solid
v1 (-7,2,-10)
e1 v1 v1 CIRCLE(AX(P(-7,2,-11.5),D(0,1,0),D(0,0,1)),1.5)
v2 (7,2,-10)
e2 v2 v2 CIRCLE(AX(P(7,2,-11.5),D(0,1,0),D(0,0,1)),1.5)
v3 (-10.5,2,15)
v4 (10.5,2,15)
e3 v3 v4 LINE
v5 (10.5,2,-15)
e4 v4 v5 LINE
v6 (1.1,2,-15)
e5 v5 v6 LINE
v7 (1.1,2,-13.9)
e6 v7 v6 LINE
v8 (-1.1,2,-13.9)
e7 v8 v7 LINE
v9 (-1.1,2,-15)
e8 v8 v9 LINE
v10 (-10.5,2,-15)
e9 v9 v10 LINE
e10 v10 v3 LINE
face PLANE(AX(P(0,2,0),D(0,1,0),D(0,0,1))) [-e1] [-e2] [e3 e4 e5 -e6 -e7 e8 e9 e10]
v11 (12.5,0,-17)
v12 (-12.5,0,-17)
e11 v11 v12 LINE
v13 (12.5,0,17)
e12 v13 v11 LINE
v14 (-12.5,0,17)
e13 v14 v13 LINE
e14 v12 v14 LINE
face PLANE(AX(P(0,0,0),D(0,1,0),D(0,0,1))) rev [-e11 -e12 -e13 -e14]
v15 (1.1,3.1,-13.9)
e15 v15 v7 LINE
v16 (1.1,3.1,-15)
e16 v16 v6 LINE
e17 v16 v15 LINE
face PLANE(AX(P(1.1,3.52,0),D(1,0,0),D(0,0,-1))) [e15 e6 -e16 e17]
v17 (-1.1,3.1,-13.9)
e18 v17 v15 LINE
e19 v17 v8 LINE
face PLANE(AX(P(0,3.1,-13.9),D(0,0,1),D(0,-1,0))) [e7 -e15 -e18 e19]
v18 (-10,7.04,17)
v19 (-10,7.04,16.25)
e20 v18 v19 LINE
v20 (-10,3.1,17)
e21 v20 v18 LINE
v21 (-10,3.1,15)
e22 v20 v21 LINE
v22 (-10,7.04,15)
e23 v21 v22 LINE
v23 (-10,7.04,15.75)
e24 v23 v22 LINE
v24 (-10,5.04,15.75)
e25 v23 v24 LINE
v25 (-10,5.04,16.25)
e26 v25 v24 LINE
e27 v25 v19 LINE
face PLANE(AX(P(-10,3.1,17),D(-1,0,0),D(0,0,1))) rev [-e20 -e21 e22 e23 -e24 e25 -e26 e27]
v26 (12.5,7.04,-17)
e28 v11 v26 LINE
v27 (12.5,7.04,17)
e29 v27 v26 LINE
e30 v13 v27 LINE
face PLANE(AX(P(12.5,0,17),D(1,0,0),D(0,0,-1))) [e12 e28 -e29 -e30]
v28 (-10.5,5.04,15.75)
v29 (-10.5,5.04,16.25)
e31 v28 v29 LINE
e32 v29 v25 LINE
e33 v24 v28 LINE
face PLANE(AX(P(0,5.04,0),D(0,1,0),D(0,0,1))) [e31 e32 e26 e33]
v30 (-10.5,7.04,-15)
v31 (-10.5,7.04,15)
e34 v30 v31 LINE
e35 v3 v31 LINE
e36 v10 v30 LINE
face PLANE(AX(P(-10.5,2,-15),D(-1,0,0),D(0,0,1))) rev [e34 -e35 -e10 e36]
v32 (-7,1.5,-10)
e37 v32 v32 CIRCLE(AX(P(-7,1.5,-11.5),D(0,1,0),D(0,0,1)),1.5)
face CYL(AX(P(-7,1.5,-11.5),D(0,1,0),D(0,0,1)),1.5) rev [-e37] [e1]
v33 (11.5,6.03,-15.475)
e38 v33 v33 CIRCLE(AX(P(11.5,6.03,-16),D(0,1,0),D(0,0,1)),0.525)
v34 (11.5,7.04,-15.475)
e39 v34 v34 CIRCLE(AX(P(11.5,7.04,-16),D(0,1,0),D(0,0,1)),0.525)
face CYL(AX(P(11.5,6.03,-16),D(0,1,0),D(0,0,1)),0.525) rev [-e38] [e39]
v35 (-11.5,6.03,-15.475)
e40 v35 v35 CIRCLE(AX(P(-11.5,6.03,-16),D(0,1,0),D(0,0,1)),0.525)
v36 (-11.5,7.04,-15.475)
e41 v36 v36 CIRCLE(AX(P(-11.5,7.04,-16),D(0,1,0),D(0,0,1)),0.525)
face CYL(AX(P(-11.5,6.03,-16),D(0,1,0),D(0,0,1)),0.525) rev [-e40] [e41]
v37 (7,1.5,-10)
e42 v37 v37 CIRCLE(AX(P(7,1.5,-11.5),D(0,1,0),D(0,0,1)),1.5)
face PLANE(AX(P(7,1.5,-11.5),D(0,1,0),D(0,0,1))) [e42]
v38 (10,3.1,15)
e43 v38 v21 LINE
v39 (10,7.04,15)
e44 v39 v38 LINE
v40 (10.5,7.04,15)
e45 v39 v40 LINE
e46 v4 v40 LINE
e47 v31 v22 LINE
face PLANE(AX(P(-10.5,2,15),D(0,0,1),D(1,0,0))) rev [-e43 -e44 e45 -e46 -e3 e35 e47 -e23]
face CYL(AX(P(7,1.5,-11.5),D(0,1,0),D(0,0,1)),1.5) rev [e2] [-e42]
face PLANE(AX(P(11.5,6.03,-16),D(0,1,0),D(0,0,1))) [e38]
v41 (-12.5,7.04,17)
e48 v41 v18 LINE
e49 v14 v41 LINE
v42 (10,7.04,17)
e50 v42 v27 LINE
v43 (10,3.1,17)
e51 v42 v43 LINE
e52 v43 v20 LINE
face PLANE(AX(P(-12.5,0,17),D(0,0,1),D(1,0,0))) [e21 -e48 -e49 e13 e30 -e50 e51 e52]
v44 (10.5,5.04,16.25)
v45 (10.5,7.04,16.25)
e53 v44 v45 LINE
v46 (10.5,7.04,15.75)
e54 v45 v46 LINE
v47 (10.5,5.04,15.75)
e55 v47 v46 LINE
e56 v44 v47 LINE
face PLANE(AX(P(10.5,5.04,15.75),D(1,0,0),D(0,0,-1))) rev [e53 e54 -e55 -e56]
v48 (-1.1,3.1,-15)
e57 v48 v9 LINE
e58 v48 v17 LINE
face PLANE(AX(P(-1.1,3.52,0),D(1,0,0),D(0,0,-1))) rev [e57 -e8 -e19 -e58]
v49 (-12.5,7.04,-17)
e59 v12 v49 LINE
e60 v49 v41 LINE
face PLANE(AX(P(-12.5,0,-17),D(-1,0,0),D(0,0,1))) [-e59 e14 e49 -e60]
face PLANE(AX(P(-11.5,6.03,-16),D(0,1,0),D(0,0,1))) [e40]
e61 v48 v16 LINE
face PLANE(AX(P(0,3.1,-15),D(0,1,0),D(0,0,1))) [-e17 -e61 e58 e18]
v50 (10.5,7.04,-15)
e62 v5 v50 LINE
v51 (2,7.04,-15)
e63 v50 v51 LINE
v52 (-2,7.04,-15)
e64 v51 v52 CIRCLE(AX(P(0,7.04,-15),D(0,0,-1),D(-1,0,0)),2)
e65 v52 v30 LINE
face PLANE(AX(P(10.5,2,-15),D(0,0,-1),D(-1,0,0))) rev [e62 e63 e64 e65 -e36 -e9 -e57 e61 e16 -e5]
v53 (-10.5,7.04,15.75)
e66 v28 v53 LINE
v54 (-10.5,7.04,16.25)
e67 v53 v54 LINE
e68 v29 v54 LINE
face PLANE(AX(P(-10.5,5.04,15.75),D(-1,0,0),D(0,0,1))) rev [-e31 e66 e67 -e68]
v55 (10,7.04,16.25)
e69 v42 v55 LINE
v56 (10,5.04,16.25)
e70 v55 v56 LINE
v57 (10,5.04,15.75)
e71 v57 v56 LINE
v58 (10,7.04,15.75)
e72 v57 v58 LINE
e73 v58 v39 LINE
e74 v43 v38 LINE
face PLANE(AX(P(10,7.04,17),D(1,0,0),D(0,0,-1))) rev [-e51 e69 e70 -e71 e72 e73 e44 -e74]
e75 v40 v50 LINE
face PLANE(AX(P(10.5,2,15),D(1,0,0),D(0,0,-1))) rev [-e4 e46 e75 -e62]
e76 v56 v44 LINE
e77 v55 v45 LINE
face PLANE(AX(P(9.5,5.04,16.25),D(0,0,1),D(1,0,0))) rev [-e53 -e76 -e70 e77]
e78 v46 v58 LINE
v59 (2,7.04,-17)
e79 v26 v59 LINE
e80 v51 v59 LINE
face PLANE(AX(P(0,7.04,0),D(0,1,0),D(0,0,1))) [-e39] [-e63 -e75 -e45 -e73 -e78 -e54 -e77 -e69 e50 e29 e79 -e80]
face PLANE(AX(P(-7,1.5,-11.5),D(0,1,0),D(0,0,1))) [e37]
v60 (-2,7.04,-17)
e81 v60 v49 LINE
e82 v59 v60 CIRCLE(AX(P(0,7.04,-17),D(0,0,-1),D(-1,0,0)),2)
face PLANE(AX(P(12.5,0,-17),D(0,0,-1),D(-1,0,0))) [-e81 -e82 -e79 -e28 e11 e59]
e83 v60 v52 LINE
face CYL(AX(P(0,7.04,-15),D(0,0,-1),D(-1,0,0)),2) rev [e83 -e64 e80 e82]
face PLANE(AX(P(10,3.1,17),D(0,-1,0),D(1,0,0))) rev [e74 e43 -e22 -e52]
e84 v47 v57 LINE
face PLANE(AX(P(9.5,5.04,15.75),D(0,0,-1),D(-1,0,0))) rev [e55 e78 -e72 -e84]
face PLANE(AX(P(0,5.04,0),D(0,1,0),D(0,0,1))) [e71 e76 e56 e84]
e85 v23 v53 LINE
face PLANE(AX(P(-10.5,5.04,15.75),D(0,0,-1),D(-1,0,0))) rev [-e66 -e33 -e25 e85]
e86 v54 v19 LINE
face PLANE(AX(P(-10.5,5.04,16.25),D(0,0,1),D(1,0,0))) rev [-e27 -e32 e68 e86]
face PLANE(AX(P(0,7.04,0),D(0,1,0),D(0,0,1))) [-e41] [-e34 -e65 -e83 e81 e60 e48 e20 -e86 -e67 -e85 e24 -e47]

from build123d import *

# Parameters (mm, degrees)
IZIM1_W                     = 25
IZIM1_H                     = 34
Y_KSEKLIK_EKSTR_ZYON1_DEPTH = 7.04
IZIM2_W                     = 21
IZIM2_H                     = 30
KES_EKSTR_ZYON1_DEPTH       = 5.04
IZIM3_W                     = 20
IZIM3_H                     = 3.94
KES_EKSTR_ZYON2_DEPTH       = 36.068669778
FEDER1_START                = -1.1
FEDER1_OUTLINE_W            = 1.1
FEDER1_OUTLINE_H            = 1.1
FEDER1_DEPTH                = 2.2
IZIM7_W                     = 1
IZIM7_H                     = 0.5
KES_EKSTR_ZYON3_DEPTH       = 2
IZIM9_R                     = 2
KES_EKSTR_ZYON4_DEPTH       = 2
IZIM10_R                    = 1.5
KES_EKSTR_ZYON5_DEPTH       = 0.5
IZIM11_R                    = 0.525
KES_EKSTR_ZYON6_DEPTH       = 1.01


# Read off the part's stored shape, not the designer's step: Feder1
with BuildPart() as part:
    # Çizim1 → Yükseklik-Ekstrüzyon1 (new body)
    with BuildSketch(Plane(origin=(0, 7.04, 0), x_dir=(1, 0, 0), z_dir=(0, 1, 0))):
        Rectangle(IZIM1_W, IZIM1_H)
    extrude(amount=-Y_KSEKLIK_EKSTR_ZYON1_DEPTH)

    # Çizim2 → Kes-Ekstrüzyon1 (cut)
    with BuildSketch(Plane(origin=(0, 7.04, 0), x_dir=(-1, 0, 0), z_dir=(0, 1, 0))):
        Rectangle(IZIM2_W, IZIM2_H)
    extrude(amount=-KES_EKSTR_ZYON1_DEPTH, mode=Mode.SUBTRACT)

    # Çizim3 → Kes-Ekstrüzyon2 (cut, through all)
    with BuildSketch(Plane(origin=(0, 0, 15), x_dir=(-1, 0, 0), z_dir=(0, 0, -1))):
        with Locations((0, 5.07)):
            Rectangle(IZIM3_W, IZIM3_H)
    extrude(amount=-KES_EKSTR_ZYON2_DEPTH, mode=Mode.SUBTRACT)

    # Feder1 outline → Feder1 (add)
    with BuildSketch(Plane(origin=(0, 0, 0), x_dir=(0, 0, -1), z_dir=(1, 0, 0)).offset(FEDER1_START)):
        with Locations((14.45, 2.55)):
            Rectangle(FEDER1_OUTLINE_W, FEDER1_OUTLINE_H)
    extrude(amount=FEDER1_DEPTH)

    # Çizim7 → Kes-Ekstrüzyon3 (cut)
    with BuildSketch(Plane(origin=(0, 7.04, 0), x_dir=(1, 0, 0), z_dir=(0, 1, 0))):
        with Locations((-10, -16)):
            Rectangle(IZIM7_W, IZIM7_H)
        with Locations((10, -16)):
            Rectangle(IZIM7_W, IZIM7_H)
    extrude(amount=-KES_EKSTR_ZYON3_DEPTH, mode=Mode.SUBTRACT)

    # Çizim9 → Kes-Ekstrüzyon4 (cut)
    with BuildSketch(Plane(origin=(0, 0, -17), x_dir=(-1, 0, 0), z_dir=(0, 0, -1))):
        with Locations((0, 7.04)):
            Circle(IZIM9_R)
    extrude(amount=-KES_EKSTR_ZYON4_DEPTH, mode=Mode.SUBTRACT)

    # Çizim10 → Kes-Ekstrüzyon5 (cut)
    with BuildSketch(Plane(origin=(0, 2, 0), x_dir=(1, 0, 0), z_dir=(0, 1, 0))):
        with Locations(Location((-7, 11.5, 0), (0, 0, 270))):
            Circle(IZIM10_R)
        with Locations(Location((7, 11.5, 0), (0, 0, 270))):
            Circle(IZIM10_R)
    extrude(amount=-KES_EKSTR_ZYON5_DEPTH, mode=Mode.SUBTRACT)

    # Çizim11 → Kes-Ekstrüzyon6 (cut)
    with BuildSketch(Plane(origin=(0, 7.04, 0), x_dir=(1, 0, 0), z_dir=(0, 1, 0))):
        with Locations(Location((-11.5, 16, 0), (0, 0, 270))):
            Circle(IZIM11_R)
        with Locations(Location((11.5, 16, 0), (0, 0, 270))):
            Circle(IZIM11_R)
    extrude(amount=-KES_EKSTR_ZYON6_DEPTH, mode=Mode.SUBTRACT)


solid = part.part
